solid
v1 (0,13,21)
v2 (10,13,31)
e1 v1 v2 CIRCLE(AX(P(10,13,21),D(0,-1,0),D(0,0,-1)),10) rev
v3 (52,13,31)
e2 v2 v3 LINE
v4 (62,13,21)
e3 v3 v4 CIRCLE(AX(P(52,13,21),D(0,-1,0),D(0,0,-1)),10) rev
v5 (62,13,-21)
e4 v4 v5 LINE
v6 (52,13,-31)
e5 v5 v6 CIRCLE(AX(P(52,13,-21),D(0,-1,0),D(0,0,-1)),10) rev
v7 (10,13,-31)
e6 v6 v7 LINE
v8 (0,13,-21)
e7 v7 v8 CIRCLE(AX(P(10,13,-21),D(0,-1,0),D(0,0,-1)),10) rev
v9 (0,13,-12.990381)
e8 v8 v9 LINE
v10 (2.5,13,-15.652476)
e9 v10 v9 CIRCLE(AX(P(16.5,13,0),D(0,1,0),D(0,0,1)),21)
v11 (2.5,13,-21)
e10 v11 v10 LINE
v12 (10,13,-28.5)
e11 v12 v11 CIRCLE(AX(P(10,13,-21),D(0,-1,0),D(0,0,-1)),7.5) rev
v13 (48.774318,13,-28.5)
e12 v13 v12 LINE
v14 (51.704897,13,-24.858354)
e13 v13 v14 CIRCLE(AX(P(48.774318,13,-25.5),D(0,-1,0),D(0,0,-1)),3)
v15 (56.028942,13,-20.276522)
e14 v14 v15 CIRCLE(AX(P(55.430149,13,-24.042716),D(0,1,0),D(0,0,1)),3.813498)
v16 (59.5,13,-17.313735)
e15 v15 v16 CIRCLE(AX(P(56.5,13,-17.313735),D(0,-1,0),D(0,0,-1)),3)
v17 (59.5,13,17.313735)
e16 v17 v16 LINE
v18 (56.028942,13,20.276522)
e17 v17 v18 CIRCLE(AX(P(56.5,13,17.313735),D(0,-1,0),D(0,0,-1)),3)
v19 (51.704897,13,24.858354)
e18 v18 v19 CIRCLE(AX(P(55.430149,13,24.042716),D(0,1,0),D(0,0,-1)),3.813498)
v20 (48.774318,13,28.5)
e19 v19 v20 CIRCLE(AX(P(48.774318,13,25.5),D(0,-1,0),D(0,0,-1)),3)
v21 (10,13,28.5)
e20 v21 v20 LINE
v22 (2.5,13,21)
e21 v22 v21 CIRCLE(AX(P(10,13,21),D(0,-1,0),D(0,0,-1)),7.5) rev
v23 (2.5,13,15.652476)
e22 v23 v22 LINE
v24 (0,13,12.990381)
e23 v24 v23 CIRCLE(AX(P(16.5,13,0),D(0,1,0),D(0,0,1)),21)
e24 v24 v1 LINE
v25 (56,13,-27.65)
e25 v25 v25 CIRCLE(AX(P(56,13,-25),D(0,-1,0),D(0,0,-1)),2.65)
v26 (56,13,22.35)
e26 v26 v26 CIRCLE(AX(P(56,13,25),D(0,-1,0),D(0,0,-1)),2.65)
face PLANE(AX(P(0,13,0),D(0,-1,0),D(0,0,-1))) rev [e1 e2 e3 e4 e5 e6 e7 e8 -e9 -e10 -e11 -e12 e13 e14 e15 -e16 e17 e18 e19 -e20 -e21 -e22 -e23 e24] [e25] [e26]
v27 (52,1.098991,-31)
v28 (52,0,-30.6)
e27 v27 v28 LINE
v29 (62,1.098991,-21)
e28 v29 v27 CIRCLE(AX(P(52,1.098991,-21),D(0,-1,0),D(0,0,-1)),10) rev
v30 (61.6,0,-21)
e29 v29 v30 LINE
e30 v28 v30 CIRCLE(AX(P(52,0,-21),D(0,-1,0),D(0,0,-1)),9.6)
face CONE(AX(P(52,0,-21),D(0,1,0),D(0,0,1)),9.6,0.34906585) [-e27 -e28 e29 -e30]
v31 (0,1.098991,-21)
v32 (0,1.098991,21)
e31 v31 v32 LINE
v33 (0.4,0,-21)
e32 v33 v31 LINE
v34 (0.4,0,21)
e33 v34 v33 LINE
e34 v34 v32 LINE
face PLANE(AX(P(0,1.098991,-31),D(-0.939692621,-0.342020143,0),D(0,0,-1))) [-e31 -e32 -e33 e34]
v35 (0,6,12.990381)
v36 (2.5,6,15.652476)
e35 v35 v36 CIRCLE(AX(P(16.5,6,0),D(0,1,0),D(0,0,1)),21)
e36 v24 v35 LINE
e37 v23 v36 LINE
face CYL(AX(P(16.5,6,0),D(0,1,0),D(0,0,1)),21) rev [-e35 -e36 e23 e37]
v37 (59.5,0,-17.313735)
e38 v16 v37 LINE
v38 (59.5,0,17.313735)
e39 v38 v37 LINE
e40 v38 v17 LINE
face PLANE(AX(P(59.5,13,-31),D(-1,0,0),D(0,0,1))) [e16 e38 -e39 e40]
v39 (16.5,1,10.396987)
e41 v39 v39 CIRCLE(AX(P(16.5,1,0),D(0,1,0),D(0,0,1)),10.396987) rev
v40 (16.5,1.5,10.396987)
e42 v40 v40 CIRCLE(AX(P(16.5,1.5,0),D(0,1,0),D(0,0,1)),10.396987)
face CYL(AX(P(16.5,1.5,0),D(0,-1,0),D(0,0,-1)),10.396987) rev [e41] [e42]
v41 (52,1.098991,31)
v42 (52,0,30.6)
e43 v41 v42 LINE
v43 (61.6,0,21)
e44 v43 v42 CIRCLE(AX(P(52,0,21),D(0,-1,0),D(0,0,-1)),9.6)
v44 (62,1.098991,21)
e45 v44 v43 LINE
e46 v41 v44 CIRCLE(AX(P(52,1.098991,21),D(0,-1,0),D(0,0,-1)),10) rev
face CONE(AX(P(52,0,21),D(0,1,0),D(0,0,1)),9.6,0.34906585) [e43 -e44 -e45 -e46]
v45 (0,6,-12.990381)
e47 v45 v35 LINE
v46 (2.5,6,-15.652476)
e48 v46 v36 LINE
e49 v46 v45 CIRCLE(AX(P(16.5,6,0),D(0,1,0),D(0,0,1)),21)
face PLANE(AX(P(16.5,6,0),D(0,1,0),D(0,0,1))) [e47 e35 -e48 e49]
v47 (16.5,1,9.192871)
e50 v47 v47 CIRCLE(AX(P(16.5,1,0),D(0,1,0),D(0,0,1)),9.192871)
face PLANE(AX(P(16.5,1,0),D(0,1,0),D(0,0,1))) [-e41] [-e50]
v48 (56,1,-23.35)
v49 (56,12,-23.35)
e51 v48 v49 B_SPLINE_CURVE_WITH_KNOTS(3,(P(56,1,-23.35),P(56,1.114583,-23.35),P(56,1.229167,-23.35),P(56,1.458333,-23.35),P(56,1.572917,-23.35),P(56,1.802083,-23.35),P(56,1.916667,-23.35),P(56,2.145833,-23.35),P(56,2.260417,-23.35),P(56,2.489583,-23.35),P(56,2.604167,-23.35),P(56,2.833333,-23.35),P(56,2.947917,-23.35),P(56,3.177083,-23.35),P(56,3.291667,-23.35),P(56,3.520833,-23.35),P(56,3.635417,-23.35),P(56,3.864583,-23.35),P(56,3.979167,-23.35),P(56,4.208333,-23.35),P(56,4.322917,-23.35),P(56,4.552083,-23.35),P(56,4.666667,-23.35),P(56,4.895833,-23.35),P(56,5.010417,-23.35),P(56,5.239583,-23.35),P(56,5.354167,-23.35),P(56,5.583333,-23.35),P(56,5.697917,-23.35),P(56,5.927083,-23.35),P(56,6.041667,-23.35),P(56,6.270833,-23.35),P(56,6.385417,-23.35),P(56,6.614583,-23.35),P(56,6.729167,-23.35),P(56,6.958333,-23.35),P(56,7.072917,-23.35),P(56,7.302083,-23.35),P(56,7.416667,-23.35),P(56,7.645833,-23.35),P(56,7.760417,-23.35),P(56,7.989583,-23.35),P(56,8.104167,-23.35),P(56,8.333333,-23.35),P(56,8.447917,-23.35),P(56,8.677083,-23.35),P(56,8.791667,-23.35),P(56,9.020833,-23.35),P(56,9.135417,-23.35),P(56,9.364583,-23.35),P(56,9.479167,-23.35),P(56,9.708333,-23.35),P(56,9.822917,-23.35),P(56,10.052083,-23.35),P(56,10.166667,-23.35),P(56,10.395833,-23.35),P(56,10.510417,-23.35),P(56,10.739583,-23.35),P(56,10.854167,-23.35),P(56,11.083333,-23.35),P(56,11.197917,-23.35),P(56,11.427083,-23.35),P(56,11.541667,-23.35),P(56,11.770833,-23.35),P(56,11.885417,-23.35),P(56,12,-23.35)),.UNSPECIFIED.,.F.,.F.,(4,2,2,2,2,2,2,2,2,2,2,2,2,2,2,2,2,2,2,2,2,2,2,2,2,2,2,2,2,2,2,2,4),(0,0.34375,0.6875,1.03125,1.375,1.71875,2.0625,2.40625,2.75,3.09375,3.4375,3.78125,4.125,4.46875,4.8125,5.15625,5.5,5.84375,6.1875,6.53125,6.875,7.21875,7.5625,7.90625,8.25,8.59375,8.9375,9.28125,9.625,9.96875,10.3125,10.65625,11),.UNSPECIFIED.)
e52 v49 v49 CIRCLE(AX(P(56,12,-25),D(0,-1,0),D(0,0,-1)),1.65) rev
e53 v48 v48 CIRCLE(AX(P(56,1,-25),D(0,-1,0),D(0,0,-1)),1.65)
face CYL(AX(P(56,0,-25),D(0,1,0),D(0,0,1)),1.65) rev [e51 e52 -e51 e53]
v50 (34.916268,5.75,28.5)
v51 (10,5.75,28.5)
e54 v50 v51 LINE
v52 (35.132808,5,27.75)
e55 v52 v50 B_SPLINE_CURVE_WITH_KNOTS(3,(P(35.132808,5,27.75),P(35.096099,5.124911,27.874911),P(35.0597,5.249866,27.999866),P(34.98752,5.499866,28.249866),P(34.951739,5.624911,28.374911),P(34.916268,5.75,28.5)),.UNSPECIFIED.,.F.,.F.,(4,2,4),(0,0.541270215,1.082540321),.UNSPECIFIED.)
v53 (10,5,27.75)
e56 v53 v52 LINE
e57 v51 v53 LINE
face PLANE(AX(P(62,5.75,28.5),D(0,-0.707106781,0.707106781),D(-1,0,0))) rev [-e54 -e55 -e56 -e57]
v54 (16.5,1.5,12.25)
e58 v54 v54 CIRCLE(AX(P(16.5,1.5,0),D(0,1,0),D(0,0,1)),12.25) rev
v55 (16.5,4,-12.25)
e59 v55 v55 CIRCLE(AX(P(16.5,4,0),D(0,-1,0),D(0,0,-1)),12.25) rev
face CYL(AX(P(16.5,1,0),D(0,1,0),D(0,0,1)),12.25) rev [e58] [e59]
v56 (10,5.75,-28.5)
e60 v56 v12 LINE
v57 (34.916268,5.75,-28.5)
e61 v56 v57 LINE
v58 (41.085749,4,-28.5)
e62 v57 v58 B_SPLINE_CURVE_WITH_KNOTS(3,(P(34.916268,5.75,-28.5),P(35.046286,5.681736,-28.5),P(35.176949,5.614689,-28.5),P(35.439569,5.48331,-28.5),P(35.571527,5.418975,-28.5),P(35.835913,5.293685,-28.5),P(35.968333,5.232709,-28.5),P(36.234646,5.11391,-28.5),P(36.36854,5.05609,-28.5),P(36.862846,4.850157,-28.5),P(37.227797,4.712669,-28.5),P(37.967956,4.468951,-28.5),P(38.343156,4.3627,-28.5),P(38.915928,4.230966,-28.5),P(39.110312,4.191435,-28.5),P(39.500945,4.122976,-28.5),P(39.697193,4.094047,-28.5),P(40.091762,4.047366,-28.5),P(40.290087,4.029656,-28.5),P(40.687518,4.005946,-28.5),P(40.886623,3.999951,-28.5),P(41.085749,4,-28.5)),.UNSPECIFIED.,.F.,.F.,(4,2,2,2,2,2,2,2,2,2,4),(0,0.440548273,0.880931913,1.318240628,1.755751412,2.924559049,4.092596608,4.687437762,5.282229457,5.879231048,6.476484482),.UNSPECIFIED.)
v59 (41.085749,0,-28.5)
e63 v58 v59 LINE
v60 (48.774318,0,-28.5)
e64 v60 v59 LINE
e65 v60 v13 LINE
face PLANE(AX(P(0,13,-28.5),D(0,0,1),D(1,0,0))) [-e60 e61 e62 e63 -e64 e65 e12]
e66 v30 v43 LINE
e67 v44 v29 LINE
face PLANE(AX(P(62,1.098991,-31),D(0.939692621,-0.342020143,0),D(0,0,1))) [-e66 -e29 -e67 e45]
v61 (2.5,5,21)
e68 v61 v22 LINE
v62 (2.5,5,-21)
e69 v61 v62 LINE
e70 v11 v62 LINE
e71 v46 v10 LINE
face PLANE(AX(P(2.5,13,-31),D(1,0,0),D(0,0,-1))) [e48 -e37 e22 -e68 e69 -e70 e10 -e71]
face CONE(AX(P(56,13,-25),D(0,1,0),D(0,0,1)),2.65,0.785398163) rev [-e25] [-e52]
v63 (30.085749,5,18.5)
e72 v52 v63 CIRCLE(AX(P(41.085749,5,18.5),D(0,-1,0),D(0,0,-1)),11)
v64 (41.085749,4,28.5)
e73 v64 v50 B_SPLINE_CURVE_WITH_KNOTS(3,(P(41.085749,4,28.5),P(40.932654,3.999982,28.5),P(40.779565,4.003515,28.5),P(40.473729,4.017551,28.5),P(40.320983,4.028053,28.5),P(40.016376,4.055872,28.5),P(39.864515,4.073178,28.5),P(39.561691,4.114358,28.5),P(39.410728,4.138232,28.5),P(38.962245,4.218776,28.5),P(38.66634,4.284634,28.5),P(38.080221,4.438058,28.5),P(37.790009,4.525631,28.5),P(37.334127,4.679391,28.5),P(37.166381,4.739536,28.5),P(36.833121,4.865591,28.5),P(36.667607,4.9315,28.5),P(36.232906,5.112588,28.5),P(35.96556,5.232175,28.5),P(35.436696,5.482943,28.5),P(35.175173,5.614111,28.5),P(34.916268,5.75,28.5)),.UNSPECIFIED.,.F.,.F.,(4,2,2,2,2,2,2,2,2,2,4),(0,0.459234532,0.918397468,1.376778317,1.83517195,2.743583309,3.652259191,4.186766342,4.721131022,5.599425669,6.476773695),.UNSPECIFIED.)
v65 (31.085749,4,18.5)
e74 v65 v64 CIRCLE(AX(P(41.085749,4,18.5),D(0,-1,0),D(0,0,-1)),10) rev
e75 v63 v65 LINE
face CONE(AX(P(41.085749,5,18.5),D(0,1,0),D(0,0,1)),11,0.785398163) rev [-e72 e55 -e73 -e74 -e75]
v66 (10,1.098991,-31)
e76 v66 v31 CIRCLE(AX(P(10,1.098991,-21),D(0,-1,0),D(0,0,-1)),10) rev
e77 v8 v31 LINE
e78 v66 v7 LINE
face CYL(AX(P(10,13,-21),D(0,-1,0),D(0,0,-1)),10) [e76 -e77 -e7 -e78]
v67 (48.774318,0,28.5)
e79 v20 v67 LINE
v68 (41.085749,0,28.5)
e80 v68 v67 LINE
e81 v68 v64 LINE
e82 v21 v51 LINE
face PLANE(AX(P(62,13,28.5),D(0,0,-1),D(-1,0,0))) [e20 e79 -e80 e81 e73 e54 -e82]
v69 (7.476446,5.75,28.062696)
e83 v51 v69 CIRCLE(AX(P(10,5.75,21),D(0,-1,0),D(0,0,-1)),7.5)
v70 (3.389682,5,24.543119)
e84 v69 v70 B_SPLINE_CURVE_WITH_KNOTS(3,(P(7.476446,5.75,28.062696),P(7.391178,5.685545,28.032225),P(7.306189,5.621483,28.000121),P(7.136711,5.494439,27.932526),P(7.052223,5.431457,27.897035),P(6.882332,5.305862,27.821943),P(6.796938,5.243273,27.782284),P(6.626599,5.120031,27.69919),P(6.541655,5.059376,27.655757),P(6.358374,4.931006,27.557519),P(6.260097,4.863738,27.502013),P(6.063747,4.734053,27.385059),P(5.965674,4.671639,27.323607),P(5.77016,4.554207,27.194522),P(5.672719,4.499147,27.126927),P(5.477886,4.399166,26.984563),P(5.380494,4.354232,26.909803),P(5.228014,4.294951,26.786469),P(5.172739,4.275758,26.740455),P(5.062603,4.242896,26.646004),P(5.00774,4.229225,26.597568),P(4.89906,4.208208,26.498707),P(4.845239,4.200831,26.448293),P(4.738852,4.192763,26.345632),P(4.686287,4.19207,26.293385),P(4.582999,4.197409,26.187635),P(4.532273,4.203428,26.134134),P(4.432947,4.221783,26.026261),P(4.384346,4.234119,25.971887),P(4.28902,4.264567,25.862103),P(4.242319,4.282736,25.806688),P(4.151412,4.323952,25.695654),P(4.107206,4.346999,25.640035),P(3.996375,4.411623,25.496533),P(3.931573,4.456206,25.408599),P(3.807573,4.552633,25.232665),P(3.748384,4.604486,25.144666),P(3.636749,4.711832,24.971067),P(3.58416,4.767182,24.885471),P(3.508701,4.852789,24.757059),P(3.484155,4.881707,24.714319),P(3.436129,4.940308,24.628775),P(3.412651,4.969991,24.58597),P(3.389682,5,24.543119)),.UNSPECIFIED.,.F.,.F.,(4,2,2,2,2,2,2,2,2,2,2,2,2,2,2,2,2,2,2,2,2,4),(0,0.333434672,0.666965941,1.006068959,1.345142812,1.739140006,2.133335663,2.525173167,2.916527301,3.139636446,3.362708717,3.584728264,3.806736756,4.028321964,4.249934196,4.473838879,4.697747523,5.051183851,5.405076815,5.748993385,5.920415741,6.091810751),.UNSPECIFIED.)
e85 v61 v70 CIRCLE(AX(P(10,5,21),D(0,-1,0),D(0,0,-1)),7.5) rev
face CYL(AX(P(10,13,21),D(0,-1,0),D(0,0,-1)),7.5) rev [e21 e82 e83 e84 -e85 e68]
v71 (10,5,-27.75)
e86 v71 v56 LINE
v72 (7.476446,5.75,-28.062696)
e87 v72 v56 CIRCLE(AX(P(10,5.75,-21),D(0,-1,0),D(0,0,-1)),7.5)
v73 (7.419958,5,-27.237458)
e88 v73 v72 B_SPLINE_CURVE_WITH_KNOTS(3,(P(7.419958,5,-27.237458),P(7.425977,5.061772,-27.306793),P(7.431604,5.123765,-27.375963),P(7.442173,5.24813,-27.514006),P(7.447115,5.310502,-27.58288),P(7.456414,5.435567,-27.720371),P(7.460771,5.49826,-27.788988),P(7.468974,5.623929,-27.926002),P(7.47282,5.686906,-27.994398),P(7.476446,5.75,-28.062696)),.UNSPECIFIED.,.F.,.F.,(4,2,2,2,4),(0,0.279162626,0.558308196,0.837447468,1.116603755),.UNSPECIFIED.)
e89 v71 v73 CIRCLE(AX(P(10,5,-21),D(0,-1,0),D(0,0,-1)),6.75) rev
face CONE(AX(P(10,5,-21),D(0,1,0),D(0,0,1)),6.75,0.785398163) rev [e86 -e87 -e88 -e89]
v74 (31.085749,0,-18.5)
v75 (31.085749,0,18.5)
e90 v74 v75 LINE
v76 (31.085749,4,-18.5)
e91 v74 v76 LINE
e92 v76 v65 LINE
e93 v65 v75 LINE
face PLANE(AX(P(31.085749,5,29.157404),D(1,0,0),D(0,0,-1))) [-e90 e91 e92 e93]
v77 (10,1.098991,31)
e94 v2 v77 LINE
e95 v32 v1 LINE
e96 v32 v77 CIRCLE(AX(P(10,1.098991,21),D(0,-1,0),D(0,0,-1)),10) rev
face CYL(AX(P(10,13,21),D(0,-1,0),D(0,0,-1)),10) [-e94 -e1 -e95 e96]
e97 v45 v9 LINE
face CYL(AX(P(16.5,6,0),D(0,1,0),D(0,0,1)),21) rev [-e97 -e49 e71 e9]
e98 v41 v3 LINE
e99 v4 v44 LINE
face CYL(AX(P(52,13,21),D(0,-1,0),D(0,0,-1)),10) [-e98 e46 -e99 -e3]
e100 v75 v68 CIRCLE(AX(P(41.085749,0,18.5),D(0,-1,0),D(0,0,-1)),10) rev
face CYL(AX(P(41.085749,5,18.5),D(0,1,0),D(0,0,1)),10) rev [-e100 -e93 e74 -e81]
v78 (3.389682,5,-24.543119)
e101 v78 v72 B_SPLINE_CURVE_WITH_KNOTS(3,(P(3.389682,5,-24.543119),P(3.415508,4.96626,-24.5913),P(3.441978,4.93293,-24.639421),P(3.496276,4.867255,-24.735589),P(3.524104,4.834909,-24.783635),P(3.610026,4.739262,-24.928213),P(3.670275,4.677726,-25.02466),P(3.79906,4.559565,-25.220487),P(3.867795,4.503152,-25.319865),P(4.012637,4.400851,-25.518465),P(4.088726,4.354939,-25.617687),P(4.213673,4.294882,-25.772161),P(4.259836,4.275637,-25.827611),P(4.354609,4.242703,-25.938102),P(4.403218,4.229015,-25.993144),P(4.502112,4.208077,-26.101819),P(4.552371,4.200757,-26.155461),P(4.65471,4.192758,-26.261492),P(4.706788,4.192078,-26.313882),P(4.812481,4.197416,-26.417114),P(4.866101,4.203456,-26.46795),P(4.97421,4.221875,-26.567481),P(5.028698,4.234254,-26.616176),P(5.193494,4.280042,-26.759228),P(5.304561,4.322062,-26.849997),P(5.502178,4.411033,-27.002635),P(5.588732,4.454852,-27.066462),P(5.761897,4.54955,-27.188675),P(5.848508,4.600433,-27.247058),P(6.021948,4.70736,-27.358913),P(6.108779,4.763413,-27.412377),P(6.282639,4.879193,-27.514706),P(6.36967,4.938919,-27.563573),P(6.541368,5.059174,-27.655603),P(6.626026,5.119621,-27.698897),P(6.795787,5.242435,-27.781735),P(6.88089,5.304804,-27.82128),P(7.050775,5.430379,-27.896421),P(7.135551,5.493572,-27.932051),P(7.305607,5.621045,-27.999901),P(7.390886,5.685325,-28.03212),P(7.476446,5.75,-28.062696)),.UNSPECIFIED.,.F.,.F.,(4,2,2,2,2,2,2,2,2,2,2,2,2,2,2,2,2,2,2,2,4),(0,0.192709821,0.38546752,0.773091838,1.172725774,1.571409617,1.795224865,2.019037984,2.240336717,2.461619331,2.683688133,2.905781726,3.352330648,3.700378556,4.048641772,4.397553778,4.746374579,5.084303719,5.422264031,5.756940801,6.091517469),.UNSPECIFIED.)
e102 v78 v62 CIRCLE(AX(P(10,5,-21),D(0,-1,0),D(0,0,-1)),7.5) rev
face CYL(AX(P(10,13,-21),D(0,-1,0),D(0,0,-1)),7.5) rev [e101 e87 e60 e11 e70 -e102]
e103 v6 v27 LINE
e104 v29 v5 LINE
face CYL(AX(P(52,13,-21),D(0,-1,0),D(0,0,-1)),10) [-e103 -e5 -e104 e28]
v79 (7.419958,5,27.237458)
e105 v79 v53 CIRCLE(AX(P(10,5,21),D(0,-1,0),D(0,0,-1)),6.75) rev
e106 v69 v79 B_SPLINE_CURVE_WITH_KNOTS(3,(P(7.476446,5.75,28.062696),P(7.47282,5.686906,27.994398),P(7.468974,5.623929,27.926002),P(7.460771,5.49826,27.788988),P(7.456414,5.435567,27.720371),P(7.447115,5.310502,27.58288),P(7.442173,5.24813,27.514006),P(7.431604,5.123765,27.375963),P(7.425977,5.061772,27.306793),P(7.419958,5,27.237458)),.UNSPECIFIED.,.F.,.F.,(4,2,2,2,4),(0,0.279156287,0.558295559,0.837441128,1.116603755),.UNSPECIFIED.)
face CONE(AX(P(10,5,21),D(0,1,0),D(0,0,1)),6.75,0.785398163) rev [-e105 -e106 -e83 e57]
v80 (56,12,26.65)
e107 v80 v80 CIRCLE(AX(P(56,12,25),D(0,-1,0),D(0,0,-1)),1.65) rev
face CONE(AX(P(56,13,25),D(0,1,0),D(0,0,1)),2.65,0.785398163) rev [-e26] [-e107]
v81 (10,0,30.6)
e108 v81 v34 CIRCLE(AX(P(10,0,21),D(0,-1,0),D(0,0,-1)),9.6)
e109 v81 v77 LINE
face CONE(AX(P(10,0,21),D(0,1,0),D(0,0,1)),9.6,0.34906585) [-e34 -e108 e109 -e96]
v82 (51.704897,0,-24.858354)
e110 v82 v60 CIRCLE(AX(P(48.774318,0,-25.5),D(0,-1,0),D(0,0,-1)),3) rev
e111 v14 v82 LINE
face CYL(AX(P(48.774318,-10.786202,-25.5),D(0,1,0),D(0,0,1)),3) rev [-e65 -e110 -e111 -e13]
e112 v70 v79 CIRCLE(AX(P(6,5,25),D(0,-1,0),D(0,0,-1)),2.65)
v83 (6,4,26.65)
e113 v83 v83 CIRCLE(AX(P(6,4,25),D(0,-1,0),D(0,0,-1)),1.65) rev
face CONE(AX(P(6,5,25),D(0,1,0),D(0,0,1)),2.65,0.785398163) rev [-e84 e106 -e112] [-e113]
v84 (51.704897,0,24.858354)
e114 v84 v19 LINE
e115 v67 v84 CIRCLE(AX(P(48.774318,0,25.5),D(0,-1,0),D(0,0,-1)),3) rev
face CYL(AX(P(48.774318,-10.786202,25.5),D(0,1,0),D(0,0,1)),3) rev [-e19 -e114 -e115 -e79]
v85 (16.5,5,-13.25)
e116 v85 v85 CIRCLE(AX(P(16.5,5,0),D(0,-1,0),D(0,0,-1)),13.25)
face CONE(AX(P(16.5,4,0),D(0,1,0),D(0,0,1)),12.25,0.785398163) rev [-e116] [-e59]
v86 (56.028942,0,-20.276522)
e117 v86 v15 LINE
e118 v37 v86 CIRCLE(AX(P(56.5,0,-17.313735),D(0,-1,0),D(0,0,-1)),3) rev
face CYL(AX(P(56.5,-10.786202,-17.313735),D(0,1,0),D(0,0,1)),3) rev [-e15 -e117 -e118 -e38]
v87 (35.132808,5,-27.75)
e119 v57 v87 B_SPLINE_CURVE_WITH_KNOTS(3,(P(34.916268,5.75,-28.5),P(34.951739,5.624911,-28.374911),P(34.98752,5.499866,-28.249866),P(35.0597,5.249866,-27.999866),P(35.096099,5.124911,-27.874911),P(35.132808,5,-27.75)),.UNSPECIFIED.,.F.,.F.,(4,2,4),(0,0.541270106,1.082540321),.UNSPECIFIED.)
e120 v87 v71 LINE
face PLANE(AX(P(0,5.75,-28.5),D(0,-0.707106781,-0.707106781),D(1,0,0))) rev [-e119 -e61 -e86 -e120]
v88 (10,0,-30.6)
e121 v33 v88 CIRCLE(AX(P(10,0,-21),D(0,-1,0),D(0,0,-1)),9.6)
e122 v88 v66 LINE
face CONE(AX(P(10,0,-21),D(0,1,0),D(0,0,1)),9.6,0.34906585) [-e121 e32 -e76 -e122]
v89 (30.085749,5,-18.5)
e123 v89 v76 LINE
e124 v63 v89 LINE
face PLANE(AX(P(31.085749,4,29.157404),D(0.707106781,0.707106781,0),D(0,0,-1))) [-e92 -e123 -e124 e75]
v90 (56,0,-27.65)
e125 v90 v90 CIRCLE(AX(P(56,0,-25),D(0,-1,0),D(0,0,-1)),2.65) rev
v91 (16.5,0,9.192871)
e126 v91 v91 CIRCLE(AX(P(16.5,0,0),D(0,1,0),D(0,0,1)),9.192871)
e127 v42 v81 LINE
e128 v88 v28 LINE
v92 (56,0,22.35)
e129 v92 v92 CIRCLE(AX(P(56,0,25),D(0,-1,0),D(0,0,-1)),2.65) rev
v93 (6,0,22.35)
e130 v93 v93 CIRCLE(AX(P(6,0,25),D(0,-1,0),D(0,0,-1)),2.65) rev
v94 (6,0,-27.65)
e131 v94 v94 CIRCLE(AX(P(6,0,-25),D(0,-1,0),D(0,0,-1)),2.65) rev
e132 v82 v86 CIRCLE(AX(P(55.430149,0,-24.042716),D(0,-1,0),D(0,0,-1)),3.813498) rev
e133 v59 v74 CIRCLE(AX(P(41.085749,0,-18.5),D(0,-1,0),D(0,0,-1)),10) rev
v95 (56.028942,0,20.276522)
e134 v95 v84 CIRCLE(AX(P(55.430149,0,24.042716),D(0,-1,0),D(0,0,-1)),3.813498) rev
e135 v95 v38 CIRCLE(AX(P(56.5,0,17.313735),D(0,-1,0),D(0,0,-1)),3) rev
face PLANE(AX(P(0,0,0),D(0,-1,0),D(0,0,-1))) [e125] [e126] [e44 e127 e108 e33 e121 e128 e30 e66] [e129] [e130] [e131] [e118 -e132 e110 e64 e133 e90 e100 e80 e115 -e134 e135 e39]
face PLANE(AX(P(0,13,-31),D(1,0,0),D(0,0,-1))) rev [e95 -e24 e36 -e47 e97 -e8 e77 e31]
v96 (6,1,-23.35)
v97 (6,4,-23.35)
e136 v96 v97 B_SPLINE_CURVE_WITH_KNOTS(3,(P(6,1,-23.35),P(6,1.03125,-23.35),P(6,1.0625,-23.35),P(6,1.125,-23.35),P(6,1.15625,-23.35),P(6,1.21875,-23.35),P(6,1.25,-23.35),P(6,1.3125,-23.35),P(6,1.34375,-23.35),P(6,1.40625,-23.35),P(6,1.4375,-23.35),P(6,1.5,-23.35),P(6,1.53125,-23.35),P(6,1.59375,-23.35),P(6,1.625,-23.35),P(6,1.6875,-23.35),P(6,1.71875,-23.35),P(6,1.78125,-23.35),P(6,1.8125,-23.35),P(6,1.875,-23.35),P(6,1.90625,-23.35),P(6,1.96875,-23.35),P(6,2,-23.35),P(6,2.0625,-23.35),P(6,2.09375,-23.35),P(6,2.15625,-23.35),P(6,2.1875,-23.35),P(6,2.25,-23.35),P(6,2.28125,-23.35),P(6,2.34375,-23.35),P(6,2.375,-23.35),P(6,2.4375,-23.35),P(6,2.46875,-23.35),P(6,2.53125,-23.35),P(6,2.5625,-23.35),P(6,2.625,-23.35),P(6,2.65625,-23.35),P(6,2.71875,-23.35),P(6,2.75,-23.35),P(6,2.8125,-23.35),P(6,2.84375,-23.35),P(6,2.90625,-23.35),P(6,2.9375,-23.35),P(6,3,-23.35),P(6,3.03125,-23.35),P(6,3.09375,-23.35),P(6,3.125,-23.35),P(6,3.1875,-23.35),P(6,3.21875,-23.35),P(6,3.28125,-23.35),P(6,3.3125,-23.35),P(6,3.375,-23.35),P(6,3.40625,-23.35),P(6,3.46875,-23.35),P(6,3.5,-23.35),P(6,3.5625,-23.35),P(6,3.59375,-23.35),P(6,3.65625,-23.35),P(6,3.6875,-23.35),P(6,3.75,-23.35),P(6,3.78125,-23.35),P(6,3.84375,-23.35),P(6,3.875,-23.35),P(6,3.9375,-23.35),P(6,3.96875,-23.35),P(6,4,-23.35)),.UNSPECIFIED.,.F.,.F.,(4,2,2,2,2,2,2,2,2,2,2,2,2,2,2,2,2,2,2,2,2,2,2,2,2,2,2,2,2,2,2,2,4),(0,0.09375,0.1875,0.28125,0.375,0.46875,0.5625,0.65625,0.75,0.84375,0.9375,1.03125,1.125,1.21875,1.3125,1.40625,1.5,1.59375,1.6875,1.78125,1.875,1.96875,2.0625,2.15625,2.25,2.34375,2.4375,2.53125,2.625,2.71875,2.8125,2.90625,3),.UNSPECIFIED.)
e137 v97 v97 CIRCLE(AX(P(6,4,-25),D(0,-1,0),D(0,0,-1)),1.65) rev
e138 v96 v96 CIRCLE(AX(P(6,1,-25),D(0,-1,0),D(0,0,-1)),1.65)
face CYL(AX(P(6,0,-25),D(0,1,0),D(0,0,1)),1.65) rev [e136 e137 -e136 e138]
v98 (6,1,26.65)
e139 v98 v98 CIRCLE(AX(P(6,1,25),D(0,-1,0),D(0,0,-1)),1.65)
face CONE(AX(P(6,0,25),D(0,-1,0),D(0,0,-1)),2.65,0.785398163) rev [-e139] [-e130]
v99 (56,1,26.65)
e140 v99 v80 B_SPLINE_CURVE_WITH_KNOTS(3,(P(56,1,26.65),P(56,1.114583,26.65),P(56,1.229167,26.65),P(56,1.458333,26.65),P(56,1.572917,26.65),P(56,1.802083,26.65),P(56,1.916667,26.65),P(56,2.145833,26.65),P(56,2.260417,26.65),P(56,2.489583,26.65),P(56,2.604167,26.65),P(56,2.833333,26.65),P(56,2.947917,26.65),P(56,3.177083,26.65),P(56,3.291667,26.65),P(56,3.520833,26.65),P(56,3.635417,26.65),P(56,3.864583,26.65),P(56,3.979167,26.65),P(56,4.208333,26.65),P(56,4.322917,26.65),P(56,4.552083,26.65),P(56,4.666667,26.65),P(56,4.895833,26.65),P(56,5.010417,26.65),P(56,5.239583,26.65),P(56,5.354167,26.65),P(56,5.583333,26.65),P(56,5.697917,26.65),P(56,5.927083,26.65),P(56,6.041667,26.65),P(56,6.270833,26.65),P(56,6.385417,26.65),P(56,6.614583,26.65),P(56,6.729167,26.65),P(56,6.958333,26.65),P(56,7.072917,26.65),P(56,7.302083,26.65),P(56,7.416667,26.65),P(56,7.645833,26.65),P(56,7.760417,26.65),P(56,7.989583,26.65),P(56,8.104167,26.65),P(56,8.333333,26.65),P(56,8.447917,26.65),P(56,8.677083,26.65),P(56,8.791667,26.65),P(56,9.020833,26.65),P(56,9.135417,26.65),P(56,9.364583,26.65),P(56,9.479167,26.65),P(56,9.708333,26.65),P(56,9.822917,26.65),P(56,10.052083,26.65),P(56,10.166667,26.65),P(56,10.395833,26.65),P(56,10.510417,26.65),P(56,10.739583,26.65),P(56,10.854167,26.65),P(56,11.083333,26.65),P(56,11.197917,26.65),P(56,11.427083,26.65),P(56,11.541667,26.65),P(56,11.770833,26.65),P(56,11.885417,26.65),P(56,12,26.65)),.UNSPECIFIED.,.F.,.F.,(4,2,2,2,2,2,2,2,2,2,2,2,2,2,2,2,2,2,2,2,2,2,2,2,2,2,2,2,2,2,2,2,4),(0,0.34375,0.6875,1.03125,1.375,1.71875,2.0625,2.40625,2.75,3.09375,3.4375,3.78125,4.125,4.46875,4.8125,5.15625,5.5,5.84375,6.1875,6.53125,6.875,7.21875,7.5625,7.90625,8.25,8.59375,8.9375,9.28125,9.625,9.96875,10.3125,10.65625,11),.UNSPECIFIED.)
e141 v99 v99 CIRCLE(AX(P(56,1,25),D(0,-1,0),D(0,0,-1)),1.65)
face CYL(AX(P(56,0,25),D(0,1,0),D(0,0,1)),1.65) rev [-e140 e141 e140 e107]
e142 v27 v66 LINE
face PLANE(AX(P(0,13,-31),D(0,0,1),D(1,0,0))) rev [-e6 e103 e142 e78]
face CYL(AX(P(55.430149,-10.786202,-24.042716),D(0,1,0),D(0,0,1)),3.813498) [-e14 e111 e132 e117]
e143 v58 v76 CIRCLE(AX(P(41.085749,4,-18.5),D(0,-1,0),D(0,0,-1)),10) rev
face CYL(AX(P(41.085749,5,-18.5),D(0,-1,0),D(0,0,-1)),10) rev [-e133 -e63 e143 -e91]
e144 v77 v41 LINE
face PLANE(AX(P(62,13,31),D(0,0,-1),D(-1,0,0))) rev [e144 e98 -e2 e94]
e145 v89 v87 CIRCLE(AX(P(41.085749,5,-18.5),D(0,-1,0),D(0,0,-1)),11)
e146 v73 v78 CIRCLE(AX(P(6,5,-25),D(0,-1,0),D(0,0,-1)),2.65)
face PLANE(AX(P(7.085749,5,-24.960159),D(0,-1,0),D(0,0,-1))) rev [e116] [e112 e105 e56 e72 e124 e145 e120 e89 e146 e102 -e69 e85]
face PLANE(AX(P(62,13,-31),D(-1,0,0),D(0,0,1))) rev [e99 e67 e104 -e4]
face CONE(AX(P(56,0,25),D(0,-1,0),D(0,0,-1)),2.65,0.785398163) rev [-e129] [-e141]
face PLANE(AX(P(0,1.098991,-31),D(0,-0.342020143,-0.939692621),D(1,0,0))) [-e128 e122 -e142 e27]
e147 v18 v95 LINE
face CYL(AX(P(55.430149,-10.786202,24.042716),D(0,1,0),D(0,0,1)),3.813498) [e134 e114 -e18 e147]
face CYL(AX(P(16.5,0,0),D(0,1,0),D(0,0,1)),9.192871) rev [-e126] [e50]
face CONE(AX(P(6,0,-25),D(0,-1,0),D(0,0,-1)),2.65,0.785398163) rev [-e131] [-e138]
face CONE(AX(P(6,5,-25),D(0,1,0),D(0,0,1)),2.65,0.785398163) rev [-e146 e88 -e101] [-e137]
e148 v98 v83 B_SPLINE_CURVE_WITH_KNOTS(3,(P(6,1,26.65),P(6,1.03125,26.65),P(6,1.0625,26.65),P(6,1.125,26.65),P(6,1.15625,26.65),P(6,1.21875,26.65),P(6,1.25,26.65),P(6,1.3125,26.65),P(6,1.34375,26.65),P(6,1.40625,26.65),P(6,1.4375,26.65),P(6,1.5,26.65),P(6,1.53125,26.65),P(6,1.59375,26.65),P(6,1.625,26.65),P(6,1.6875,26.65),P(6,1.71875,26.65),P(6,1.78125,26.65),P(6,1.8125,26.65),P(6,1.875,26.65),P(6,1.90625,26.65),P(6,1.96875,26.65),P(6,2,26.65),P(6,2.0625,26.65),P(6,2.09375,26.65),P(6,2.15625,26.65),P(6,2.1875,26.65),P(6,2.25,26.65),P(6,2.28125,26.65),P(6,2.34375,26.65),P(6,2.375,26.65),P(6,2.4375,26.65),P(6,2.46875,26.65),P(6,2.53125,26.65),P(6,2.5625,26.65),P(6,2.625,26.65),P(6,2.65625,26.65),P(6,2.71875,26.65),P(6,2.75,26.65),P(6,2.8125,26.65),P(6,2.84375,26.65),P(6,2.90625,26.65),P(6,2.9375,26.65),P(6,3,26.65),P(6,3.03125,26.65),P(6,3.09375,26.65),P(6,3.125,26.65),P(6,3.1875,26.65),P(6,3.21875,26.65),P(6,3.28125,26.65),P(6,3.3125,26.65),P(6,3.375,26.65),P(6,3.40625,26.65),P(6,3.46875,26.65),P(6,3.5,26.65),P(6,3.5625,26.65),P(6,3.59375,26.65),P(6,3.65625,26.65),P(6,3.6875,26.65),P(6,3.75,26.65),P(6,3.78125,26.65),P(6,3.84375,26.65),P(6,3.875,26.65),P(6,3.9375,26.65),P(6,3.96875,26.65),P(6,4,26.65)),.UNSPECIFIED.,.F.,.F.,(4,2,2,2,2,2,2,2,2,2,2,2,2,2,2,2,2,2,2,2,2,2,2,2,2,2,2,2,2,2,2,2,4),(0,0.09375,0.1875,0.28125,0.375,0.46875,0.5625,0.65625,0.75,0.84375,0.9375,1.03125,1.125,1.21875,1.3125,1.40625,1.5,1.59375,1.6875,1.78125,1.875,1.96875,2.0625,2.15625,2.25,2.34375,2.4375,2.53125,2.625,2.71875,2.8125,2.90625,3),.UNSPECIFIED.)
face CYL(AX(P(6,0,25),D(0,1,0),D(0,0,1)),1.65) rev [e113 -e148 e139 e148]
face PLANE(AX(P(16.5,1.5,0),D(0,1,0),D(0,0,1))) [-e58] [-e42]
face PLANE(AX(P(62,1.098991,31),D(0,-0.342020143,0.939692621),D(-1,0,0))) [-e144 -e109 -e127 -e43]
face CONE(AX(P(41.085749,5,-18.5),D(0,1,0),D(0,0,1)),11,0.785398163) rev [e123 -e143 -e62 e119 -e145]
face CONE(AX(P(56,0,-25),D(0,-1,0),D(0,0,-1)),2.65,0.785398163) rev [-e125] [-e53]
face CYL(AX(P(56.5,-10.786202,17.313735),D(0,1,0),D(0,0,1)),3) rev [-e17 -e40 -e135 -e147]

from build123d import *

# Parameters (mm, degrees)
CROQUIS1_W                 = 62
CROQUIS1_H                 = 62
SALIENTE_EXTRUIR1_DEPTH    = 13
REDONDEO1_R                = 10
REDONDEO2_R                = 10
VACIADO1_T                 = -2.5
CROQUIS2_R                 = 21
CORTAR_EXTRUIR1_DEPTH      = 7
SALIENTE_EXTRUIR2_DEPTH    = 5
CROQUIS6_R                 = 12.25
CORTAR_EXTRUIR4_DEPTH      = 4
REDONDEO3_R                = 10
CROQUIS8_R                 = 3.813498279
SALIENTE_EXTRUIR3_DEPTH    = 13
REDONDEO4_R                = 3
CORTAR_EXTRUIR7_DEPTH      = 71.52659088
CORTAR_EXTRUIR7_DEPTH_BACK = 71.52659088
CROQUIS9_R                 = 1.65
CHAFL_N1_SIZE              = 1
CHAFL_N2_SIZE              = 1
CHAFL_N3_SIZE              = 1
CHAFL_N4_SIZE              = 0.4
CHAFL_N4_SIZE2             = 1.098990968
CHAFL_N5_SIZE              = 1
CROQUIS10_R                = 14.000593708
CROQUIS10_R_2              = 10.396987038
SALIENTE_EXTRUIR4_DEPTH    = 0.5
CROQUIS11_R                = 9.192870702
CORTAR_EXTRUIR8_DEPTH      = 71.349129497
CHAFL_N6_SIZE              = 0.75


with BuildPart() as part:
    # Croquis1 → Saliente-Extruir1 (new body)
    with BuildSketch(Plane(origin=(0, 0, 0), x_dir=(1, 0, 0), z_dir=(0, 1, 0))):
        with Locations((31, 0)):
            Rectangle(CROQUIS1_W, CROQUIS1_H)
    extrude(amount=SALIENTE_EXTRUIR1_DEPTH)

    # Redondeo1
    redondeo1_edges = [part.edges().sort_by_distance(p)[0] for p in [
        (62, 6.5, -31),
        (62, 6.5, 31),
    ]]
    fillet(redondeo1_edges, radius=REDONDEO1_R)

    # Redondeo2
    redondeo2_edges = [part.edges().sort_by_distance(p)[0] for p in [
        (0, 6.5, -31),
        (0, 6.5, 31),
    ]]
    fillet(redondeo2_edges, radius=REDONDEO2_R)

    # Vaciado1
    vaciado1_openings = [part.faces().sort_by_distance(p)[0] for p in [
        (31, 13, 0),
        (31, 0, 0),
    ]]
    offset(amount=VACIADO1_T, openings=vaciado1_openings, kind=Kind.INTERSECTION)

    # Croquis2 → Cortar-Extruir1 (cut)
    with BuildSketch(Plane(origin=(0, 13, 0), x_dir=(1, 0, 0), z_dir=(0, 1, 0))):
        with Locations((16.5, 0)):
            Circle(CROQUIS2_R)
    extrude(amount=-CORTAR_EXTRUIR1_DEPTH, mode=Mode.SUBTRACT)

    # Croquis4 → Saliente-Extruir2 (add)
    with BuildSketch(Plane.XZ):
        with BuildLine():
            Line((7.085748882, 29.157404391), (31.085748882, 29.157404391))
            Line((31.085748882, 29.157404391), (31.085748882, -29.960159471))
            Line((31.085748882, -29.960159471), (7.085748882, -29.960159471))
            ThreePointArc((7.085748882, -29.960159471), (3.550214976, -28.495693377), (2.085748882, -24.960159471))
            Line((2.085748882, -24.960159471), (2.085748882, 24.157404391))
            ThreePointArc((2.085748882, 24.157404391), (3.550214976, 27.692938297), (7.085748882, 29.157404391))
        make_face()
    extrude(amount=-SALIENTE_EXTRUIR2_DEPTH)

    # Croquis6 → Cortar-Extruir4 (cut)
    with BuildSketch(Plane(origin=(0, 5, 0), x_dir=(1, 0, 0), z_dir=(0, 1, 0))):
        with Locations(Location((16.5, 0, 0), (0, 0, 270))):
            Circle(CROQUIS6_R)
    extrude(amount=-CORTAR_EXTRUIR4_DEPTH, mode=Mode.SUBTRACT)

    # Redondeo3
    redondeo3_edges = [part.edges().sort_by_distance(p)[0] for p in [
        (31.085748882, 2.5, -28.5),
        (31.085748882, 2.5, 28.5),
    ]]
    fillet(redondeo3_edges, radius=REDONDEO3_R)

    # Croquis8 → Saliente-Extruir3 (add)
    with BuildSketch(Plane(origin=(0, 13, 0), x_dir=(1, 0, 0), z_dir=(0, 1, 0))):
        with Locations((55.43014903, 24.042715564)):
            Circle(CROQUIS8_R)
        with Locations((55.43014903, -24.042715564)):
            Circle(CROQUIS8_R)
    extrude(amount=-SALIENTE_EXTRUIR3_DEPTH)

    # Redondeo4
    redondeo4_edges = [part.edges().sort_by_distance(p)[0] for p in [
        (55.076843568, 6.5, 27.839812399),
        (59.157992619, 6.5, 23.239004614),
        (59.157992619, 6.5, -23.239004614),
        (55.076843568, 6.5, -27.839812399),
    ]]
    fillet(redondeo4_edges, radius=REDONDEO4_R)

    # Croquis9 → Cortar-Extruir7 (cut, two sides: drawn at the far end of the back side and taken through both)
    with BuildSketch(Plane(origin=(0, 13, 0), x_dir=(1, 0, 0), z_dir=(0, 1, 0)).offset(-CORTAR_EXTRUIR7_DEPTH_BACK)):
        with Locations(Location((6, 25, 0), (0, 0, 270))):
            Circle(CROQUIS9_R)
        with Locations(Location((56, -25, 0), (0, 0, 270))):
            Circle(CROQUIS9_R)
        with Locations(Location((56, 25, 0), (0, 0, 270))):
            Circle(CROQUIS9_R)
        with Locations(Location((6, -25, 0), (0, 0, 270))):
            Circle(CROQUIS9_R)
    extrude(amount=CORTAR_EXTRUIR7_DEPTH + CORTAR_EXTRUIR7_DEPTH_BACK, mode=Mode.SUBTRACT)

    # Chaflán1
    # the kernel refuses this chamfer: 1 mm, written as the material it takes off along each edge
    with BuildSketch(Plane(origin=(6, 5, 25), x_dir=(0, 0, 1), z_dir=(-1, 0, 0))) as chafl_n1_piece_1_section:
        Polygon((1.65, -CHAFL_N1_SIZE), (1.65 + CHAFL_N1_SIZE, 0), (1.65, 0), align=None)
    chafl_n1_piece_1 = revolve(axis=Axis((6, 5, 25), (0, 1, 0)), mode=Mode.PRIVATE)
    chafl_n1_piece_1 = chafl_n1_piece_1 & Plane(origin=(10, 4.51284456, 21), x_dir=(-1, 0, 0), z_dir=(0, 1, 0)) * Cylinder(7.5, 11, mode=Mode.PRIVATE)
    add(chafl_n1_piece_1, mode=Mode.SUBTRACT)
    with BuildSketch(Plane(origin=(56, 13, -25), x_dir=(0, 0, 1), z_dir=(-1, 0, 0))) as chafl_n1_piece_2:
        Polygon((1.65, -CHAFL_N1_SIZE), (1.65 + CHAFL_N1_SIZE, 0), (1.65, 0), align=None)
    revolve(axis=Axis((56, 13, -25), (0, 1, 0)), mode=Mode.SUBTRACT)
    with BuildSketch(Plane(origin=(56, 13, 25), x_dir=(0, 0, 1), z_dir=(-1, 0, 0))) as chafl_n1_piece_3:
        Polygon((1.65, -CHAFL_N1_SIZE), (1.65 + CHAFL_N1_SIZE, 0), (1.65, 0), align=None)
    revolve(axis=Axis((56, 13, 25), (0, 1, 0)), mode=Mode.SUBTRACT)
    with BuildSketch(Plane(origin=(6, 5, -25), x_dir=(0, 0, 1), z_dir=(-1, 0, 0))) as chafl_n1_piece_4_section:
        Polygon((1.65, -CHAFL_N1_SIZE), (1.65 + CHAFL_N1_SIZE, 0), (1.65, 0), align=None)
    chafl_n1_piece_4 = revolve(axis=Axis((6, 5, -25), (0, 1, 0)), mode=Mode.PRIVATE)
    chafl_n1_piece_4 = chafl_n1_piece_4 & Plane(origin=(10, 4.512844583, -21), x_dir=(0, 0, -1), z_dir=(0, 1, 0)) * Cylinder(7.5, 11, mode=Mode.PRIVATE)
    add(chafl_n1_piece_4, mode=Mode.SUBTRACT)

    # Chaflán2
    chafl_n2_edges = [part.edges().sort_by_distance(p)[0] for p in [
        (16.5, 5, -12.25),
    ]]
    chamfer(chafl_n2_edges, length=CHAFL_N2_SIZE)

    # Chaflán3
    chafl_n3_edges = [part.edges().sort_by_distance(p)[0] for p in [
        (31.085748882, 5, 0),
        (34.01468107, 5, 25.571067812),
        (34.01468107, 5, -25.571067812),
    ]]
    chamfer(chafl_n3_edges, length=CHAFL_N3_SIZE)

    # Chaflán4
    chafl_n4_edges = [part.edges().sort_by_distance(p)[0] for p in [
        (31, 0, -31),
        (62, 0, 0),
        (59.071067812, 0, 28.071067812),
        (59.071067812, 0, -28.071067812),
        (31, 0, 31),
        (0, 0, 0),
        (2.928932188, 0, -28.071067812),
        (2.928932188, 0, 28.071067812),
    ]]
    chafl_n4_side = [part.faces().sort_by_distance(p)[0] for p in [
        (22.290109536, 0, 0),
    ]]
    chamfer(chafl_n4_edges, length=CHAFL_N4_SIZE, length2=CHAFL_N4_SIZE2, reference=chafl_n4_side[0])

    # Chaflán5
    chafl_n5_edges = [part.edges().sort_by_distance(p)[0] for p in [
        (6, 0, 23.35),
        (56, 0, -26.65),
        (56, 0, 23.35),
        (6, 0, -26.65),
    ]]
    chamfer(chafl_n5_edges, length=CHAFL_N5_SIZE)

    # Croquis10 → Saliente-Extruir4 (add)
    with BuildSketch(Plane(origin=(0, 1, 0), x_dir=(1, 0, 0), z_dir=(0, 1, 0))):
        with Locations((16.5, 0)):
            Circle(CROQUIS10_R)
        with Locations(Location((16.5, 0, 0), (0, 0, 270))):
            Circle(CROQUIS10_R_2, mode=Mode.SUBTRACT)
    extrude(amount=SALIENTE_EXTRUIR4_DEPTH)

    # Croquis11 → Cortar-Extruir8 (cut, through all)
    with BuildSketch(Plane(origin=(0, 1, 0), x_dir=(1, 0, 0), z_dir=(0, 1, 0))):
        with Locations(Location((16.5, 0, 0), (0, 0, 270))):
            Circle(CROQUIS11_R)
    extrude(amount=-CORTAR_EXTRUIR8_DEPTH, mode=Mode.SUBTRACT)

    # Chaflán6
    chafl_n6_edges = [part.edges().sort_by_distance(p)[0] for p in [
        (8.173443839, 5, 28.274179857),
        (23.251586594, 5, 28.5),
        (8.173443839, 5, -28.274179857),
        (23.251586594, 5, -28.5),
    ]]
    chamfer(chafl_n6_edges, length=CHAFL_N6_SIZE)


solid = part.part
